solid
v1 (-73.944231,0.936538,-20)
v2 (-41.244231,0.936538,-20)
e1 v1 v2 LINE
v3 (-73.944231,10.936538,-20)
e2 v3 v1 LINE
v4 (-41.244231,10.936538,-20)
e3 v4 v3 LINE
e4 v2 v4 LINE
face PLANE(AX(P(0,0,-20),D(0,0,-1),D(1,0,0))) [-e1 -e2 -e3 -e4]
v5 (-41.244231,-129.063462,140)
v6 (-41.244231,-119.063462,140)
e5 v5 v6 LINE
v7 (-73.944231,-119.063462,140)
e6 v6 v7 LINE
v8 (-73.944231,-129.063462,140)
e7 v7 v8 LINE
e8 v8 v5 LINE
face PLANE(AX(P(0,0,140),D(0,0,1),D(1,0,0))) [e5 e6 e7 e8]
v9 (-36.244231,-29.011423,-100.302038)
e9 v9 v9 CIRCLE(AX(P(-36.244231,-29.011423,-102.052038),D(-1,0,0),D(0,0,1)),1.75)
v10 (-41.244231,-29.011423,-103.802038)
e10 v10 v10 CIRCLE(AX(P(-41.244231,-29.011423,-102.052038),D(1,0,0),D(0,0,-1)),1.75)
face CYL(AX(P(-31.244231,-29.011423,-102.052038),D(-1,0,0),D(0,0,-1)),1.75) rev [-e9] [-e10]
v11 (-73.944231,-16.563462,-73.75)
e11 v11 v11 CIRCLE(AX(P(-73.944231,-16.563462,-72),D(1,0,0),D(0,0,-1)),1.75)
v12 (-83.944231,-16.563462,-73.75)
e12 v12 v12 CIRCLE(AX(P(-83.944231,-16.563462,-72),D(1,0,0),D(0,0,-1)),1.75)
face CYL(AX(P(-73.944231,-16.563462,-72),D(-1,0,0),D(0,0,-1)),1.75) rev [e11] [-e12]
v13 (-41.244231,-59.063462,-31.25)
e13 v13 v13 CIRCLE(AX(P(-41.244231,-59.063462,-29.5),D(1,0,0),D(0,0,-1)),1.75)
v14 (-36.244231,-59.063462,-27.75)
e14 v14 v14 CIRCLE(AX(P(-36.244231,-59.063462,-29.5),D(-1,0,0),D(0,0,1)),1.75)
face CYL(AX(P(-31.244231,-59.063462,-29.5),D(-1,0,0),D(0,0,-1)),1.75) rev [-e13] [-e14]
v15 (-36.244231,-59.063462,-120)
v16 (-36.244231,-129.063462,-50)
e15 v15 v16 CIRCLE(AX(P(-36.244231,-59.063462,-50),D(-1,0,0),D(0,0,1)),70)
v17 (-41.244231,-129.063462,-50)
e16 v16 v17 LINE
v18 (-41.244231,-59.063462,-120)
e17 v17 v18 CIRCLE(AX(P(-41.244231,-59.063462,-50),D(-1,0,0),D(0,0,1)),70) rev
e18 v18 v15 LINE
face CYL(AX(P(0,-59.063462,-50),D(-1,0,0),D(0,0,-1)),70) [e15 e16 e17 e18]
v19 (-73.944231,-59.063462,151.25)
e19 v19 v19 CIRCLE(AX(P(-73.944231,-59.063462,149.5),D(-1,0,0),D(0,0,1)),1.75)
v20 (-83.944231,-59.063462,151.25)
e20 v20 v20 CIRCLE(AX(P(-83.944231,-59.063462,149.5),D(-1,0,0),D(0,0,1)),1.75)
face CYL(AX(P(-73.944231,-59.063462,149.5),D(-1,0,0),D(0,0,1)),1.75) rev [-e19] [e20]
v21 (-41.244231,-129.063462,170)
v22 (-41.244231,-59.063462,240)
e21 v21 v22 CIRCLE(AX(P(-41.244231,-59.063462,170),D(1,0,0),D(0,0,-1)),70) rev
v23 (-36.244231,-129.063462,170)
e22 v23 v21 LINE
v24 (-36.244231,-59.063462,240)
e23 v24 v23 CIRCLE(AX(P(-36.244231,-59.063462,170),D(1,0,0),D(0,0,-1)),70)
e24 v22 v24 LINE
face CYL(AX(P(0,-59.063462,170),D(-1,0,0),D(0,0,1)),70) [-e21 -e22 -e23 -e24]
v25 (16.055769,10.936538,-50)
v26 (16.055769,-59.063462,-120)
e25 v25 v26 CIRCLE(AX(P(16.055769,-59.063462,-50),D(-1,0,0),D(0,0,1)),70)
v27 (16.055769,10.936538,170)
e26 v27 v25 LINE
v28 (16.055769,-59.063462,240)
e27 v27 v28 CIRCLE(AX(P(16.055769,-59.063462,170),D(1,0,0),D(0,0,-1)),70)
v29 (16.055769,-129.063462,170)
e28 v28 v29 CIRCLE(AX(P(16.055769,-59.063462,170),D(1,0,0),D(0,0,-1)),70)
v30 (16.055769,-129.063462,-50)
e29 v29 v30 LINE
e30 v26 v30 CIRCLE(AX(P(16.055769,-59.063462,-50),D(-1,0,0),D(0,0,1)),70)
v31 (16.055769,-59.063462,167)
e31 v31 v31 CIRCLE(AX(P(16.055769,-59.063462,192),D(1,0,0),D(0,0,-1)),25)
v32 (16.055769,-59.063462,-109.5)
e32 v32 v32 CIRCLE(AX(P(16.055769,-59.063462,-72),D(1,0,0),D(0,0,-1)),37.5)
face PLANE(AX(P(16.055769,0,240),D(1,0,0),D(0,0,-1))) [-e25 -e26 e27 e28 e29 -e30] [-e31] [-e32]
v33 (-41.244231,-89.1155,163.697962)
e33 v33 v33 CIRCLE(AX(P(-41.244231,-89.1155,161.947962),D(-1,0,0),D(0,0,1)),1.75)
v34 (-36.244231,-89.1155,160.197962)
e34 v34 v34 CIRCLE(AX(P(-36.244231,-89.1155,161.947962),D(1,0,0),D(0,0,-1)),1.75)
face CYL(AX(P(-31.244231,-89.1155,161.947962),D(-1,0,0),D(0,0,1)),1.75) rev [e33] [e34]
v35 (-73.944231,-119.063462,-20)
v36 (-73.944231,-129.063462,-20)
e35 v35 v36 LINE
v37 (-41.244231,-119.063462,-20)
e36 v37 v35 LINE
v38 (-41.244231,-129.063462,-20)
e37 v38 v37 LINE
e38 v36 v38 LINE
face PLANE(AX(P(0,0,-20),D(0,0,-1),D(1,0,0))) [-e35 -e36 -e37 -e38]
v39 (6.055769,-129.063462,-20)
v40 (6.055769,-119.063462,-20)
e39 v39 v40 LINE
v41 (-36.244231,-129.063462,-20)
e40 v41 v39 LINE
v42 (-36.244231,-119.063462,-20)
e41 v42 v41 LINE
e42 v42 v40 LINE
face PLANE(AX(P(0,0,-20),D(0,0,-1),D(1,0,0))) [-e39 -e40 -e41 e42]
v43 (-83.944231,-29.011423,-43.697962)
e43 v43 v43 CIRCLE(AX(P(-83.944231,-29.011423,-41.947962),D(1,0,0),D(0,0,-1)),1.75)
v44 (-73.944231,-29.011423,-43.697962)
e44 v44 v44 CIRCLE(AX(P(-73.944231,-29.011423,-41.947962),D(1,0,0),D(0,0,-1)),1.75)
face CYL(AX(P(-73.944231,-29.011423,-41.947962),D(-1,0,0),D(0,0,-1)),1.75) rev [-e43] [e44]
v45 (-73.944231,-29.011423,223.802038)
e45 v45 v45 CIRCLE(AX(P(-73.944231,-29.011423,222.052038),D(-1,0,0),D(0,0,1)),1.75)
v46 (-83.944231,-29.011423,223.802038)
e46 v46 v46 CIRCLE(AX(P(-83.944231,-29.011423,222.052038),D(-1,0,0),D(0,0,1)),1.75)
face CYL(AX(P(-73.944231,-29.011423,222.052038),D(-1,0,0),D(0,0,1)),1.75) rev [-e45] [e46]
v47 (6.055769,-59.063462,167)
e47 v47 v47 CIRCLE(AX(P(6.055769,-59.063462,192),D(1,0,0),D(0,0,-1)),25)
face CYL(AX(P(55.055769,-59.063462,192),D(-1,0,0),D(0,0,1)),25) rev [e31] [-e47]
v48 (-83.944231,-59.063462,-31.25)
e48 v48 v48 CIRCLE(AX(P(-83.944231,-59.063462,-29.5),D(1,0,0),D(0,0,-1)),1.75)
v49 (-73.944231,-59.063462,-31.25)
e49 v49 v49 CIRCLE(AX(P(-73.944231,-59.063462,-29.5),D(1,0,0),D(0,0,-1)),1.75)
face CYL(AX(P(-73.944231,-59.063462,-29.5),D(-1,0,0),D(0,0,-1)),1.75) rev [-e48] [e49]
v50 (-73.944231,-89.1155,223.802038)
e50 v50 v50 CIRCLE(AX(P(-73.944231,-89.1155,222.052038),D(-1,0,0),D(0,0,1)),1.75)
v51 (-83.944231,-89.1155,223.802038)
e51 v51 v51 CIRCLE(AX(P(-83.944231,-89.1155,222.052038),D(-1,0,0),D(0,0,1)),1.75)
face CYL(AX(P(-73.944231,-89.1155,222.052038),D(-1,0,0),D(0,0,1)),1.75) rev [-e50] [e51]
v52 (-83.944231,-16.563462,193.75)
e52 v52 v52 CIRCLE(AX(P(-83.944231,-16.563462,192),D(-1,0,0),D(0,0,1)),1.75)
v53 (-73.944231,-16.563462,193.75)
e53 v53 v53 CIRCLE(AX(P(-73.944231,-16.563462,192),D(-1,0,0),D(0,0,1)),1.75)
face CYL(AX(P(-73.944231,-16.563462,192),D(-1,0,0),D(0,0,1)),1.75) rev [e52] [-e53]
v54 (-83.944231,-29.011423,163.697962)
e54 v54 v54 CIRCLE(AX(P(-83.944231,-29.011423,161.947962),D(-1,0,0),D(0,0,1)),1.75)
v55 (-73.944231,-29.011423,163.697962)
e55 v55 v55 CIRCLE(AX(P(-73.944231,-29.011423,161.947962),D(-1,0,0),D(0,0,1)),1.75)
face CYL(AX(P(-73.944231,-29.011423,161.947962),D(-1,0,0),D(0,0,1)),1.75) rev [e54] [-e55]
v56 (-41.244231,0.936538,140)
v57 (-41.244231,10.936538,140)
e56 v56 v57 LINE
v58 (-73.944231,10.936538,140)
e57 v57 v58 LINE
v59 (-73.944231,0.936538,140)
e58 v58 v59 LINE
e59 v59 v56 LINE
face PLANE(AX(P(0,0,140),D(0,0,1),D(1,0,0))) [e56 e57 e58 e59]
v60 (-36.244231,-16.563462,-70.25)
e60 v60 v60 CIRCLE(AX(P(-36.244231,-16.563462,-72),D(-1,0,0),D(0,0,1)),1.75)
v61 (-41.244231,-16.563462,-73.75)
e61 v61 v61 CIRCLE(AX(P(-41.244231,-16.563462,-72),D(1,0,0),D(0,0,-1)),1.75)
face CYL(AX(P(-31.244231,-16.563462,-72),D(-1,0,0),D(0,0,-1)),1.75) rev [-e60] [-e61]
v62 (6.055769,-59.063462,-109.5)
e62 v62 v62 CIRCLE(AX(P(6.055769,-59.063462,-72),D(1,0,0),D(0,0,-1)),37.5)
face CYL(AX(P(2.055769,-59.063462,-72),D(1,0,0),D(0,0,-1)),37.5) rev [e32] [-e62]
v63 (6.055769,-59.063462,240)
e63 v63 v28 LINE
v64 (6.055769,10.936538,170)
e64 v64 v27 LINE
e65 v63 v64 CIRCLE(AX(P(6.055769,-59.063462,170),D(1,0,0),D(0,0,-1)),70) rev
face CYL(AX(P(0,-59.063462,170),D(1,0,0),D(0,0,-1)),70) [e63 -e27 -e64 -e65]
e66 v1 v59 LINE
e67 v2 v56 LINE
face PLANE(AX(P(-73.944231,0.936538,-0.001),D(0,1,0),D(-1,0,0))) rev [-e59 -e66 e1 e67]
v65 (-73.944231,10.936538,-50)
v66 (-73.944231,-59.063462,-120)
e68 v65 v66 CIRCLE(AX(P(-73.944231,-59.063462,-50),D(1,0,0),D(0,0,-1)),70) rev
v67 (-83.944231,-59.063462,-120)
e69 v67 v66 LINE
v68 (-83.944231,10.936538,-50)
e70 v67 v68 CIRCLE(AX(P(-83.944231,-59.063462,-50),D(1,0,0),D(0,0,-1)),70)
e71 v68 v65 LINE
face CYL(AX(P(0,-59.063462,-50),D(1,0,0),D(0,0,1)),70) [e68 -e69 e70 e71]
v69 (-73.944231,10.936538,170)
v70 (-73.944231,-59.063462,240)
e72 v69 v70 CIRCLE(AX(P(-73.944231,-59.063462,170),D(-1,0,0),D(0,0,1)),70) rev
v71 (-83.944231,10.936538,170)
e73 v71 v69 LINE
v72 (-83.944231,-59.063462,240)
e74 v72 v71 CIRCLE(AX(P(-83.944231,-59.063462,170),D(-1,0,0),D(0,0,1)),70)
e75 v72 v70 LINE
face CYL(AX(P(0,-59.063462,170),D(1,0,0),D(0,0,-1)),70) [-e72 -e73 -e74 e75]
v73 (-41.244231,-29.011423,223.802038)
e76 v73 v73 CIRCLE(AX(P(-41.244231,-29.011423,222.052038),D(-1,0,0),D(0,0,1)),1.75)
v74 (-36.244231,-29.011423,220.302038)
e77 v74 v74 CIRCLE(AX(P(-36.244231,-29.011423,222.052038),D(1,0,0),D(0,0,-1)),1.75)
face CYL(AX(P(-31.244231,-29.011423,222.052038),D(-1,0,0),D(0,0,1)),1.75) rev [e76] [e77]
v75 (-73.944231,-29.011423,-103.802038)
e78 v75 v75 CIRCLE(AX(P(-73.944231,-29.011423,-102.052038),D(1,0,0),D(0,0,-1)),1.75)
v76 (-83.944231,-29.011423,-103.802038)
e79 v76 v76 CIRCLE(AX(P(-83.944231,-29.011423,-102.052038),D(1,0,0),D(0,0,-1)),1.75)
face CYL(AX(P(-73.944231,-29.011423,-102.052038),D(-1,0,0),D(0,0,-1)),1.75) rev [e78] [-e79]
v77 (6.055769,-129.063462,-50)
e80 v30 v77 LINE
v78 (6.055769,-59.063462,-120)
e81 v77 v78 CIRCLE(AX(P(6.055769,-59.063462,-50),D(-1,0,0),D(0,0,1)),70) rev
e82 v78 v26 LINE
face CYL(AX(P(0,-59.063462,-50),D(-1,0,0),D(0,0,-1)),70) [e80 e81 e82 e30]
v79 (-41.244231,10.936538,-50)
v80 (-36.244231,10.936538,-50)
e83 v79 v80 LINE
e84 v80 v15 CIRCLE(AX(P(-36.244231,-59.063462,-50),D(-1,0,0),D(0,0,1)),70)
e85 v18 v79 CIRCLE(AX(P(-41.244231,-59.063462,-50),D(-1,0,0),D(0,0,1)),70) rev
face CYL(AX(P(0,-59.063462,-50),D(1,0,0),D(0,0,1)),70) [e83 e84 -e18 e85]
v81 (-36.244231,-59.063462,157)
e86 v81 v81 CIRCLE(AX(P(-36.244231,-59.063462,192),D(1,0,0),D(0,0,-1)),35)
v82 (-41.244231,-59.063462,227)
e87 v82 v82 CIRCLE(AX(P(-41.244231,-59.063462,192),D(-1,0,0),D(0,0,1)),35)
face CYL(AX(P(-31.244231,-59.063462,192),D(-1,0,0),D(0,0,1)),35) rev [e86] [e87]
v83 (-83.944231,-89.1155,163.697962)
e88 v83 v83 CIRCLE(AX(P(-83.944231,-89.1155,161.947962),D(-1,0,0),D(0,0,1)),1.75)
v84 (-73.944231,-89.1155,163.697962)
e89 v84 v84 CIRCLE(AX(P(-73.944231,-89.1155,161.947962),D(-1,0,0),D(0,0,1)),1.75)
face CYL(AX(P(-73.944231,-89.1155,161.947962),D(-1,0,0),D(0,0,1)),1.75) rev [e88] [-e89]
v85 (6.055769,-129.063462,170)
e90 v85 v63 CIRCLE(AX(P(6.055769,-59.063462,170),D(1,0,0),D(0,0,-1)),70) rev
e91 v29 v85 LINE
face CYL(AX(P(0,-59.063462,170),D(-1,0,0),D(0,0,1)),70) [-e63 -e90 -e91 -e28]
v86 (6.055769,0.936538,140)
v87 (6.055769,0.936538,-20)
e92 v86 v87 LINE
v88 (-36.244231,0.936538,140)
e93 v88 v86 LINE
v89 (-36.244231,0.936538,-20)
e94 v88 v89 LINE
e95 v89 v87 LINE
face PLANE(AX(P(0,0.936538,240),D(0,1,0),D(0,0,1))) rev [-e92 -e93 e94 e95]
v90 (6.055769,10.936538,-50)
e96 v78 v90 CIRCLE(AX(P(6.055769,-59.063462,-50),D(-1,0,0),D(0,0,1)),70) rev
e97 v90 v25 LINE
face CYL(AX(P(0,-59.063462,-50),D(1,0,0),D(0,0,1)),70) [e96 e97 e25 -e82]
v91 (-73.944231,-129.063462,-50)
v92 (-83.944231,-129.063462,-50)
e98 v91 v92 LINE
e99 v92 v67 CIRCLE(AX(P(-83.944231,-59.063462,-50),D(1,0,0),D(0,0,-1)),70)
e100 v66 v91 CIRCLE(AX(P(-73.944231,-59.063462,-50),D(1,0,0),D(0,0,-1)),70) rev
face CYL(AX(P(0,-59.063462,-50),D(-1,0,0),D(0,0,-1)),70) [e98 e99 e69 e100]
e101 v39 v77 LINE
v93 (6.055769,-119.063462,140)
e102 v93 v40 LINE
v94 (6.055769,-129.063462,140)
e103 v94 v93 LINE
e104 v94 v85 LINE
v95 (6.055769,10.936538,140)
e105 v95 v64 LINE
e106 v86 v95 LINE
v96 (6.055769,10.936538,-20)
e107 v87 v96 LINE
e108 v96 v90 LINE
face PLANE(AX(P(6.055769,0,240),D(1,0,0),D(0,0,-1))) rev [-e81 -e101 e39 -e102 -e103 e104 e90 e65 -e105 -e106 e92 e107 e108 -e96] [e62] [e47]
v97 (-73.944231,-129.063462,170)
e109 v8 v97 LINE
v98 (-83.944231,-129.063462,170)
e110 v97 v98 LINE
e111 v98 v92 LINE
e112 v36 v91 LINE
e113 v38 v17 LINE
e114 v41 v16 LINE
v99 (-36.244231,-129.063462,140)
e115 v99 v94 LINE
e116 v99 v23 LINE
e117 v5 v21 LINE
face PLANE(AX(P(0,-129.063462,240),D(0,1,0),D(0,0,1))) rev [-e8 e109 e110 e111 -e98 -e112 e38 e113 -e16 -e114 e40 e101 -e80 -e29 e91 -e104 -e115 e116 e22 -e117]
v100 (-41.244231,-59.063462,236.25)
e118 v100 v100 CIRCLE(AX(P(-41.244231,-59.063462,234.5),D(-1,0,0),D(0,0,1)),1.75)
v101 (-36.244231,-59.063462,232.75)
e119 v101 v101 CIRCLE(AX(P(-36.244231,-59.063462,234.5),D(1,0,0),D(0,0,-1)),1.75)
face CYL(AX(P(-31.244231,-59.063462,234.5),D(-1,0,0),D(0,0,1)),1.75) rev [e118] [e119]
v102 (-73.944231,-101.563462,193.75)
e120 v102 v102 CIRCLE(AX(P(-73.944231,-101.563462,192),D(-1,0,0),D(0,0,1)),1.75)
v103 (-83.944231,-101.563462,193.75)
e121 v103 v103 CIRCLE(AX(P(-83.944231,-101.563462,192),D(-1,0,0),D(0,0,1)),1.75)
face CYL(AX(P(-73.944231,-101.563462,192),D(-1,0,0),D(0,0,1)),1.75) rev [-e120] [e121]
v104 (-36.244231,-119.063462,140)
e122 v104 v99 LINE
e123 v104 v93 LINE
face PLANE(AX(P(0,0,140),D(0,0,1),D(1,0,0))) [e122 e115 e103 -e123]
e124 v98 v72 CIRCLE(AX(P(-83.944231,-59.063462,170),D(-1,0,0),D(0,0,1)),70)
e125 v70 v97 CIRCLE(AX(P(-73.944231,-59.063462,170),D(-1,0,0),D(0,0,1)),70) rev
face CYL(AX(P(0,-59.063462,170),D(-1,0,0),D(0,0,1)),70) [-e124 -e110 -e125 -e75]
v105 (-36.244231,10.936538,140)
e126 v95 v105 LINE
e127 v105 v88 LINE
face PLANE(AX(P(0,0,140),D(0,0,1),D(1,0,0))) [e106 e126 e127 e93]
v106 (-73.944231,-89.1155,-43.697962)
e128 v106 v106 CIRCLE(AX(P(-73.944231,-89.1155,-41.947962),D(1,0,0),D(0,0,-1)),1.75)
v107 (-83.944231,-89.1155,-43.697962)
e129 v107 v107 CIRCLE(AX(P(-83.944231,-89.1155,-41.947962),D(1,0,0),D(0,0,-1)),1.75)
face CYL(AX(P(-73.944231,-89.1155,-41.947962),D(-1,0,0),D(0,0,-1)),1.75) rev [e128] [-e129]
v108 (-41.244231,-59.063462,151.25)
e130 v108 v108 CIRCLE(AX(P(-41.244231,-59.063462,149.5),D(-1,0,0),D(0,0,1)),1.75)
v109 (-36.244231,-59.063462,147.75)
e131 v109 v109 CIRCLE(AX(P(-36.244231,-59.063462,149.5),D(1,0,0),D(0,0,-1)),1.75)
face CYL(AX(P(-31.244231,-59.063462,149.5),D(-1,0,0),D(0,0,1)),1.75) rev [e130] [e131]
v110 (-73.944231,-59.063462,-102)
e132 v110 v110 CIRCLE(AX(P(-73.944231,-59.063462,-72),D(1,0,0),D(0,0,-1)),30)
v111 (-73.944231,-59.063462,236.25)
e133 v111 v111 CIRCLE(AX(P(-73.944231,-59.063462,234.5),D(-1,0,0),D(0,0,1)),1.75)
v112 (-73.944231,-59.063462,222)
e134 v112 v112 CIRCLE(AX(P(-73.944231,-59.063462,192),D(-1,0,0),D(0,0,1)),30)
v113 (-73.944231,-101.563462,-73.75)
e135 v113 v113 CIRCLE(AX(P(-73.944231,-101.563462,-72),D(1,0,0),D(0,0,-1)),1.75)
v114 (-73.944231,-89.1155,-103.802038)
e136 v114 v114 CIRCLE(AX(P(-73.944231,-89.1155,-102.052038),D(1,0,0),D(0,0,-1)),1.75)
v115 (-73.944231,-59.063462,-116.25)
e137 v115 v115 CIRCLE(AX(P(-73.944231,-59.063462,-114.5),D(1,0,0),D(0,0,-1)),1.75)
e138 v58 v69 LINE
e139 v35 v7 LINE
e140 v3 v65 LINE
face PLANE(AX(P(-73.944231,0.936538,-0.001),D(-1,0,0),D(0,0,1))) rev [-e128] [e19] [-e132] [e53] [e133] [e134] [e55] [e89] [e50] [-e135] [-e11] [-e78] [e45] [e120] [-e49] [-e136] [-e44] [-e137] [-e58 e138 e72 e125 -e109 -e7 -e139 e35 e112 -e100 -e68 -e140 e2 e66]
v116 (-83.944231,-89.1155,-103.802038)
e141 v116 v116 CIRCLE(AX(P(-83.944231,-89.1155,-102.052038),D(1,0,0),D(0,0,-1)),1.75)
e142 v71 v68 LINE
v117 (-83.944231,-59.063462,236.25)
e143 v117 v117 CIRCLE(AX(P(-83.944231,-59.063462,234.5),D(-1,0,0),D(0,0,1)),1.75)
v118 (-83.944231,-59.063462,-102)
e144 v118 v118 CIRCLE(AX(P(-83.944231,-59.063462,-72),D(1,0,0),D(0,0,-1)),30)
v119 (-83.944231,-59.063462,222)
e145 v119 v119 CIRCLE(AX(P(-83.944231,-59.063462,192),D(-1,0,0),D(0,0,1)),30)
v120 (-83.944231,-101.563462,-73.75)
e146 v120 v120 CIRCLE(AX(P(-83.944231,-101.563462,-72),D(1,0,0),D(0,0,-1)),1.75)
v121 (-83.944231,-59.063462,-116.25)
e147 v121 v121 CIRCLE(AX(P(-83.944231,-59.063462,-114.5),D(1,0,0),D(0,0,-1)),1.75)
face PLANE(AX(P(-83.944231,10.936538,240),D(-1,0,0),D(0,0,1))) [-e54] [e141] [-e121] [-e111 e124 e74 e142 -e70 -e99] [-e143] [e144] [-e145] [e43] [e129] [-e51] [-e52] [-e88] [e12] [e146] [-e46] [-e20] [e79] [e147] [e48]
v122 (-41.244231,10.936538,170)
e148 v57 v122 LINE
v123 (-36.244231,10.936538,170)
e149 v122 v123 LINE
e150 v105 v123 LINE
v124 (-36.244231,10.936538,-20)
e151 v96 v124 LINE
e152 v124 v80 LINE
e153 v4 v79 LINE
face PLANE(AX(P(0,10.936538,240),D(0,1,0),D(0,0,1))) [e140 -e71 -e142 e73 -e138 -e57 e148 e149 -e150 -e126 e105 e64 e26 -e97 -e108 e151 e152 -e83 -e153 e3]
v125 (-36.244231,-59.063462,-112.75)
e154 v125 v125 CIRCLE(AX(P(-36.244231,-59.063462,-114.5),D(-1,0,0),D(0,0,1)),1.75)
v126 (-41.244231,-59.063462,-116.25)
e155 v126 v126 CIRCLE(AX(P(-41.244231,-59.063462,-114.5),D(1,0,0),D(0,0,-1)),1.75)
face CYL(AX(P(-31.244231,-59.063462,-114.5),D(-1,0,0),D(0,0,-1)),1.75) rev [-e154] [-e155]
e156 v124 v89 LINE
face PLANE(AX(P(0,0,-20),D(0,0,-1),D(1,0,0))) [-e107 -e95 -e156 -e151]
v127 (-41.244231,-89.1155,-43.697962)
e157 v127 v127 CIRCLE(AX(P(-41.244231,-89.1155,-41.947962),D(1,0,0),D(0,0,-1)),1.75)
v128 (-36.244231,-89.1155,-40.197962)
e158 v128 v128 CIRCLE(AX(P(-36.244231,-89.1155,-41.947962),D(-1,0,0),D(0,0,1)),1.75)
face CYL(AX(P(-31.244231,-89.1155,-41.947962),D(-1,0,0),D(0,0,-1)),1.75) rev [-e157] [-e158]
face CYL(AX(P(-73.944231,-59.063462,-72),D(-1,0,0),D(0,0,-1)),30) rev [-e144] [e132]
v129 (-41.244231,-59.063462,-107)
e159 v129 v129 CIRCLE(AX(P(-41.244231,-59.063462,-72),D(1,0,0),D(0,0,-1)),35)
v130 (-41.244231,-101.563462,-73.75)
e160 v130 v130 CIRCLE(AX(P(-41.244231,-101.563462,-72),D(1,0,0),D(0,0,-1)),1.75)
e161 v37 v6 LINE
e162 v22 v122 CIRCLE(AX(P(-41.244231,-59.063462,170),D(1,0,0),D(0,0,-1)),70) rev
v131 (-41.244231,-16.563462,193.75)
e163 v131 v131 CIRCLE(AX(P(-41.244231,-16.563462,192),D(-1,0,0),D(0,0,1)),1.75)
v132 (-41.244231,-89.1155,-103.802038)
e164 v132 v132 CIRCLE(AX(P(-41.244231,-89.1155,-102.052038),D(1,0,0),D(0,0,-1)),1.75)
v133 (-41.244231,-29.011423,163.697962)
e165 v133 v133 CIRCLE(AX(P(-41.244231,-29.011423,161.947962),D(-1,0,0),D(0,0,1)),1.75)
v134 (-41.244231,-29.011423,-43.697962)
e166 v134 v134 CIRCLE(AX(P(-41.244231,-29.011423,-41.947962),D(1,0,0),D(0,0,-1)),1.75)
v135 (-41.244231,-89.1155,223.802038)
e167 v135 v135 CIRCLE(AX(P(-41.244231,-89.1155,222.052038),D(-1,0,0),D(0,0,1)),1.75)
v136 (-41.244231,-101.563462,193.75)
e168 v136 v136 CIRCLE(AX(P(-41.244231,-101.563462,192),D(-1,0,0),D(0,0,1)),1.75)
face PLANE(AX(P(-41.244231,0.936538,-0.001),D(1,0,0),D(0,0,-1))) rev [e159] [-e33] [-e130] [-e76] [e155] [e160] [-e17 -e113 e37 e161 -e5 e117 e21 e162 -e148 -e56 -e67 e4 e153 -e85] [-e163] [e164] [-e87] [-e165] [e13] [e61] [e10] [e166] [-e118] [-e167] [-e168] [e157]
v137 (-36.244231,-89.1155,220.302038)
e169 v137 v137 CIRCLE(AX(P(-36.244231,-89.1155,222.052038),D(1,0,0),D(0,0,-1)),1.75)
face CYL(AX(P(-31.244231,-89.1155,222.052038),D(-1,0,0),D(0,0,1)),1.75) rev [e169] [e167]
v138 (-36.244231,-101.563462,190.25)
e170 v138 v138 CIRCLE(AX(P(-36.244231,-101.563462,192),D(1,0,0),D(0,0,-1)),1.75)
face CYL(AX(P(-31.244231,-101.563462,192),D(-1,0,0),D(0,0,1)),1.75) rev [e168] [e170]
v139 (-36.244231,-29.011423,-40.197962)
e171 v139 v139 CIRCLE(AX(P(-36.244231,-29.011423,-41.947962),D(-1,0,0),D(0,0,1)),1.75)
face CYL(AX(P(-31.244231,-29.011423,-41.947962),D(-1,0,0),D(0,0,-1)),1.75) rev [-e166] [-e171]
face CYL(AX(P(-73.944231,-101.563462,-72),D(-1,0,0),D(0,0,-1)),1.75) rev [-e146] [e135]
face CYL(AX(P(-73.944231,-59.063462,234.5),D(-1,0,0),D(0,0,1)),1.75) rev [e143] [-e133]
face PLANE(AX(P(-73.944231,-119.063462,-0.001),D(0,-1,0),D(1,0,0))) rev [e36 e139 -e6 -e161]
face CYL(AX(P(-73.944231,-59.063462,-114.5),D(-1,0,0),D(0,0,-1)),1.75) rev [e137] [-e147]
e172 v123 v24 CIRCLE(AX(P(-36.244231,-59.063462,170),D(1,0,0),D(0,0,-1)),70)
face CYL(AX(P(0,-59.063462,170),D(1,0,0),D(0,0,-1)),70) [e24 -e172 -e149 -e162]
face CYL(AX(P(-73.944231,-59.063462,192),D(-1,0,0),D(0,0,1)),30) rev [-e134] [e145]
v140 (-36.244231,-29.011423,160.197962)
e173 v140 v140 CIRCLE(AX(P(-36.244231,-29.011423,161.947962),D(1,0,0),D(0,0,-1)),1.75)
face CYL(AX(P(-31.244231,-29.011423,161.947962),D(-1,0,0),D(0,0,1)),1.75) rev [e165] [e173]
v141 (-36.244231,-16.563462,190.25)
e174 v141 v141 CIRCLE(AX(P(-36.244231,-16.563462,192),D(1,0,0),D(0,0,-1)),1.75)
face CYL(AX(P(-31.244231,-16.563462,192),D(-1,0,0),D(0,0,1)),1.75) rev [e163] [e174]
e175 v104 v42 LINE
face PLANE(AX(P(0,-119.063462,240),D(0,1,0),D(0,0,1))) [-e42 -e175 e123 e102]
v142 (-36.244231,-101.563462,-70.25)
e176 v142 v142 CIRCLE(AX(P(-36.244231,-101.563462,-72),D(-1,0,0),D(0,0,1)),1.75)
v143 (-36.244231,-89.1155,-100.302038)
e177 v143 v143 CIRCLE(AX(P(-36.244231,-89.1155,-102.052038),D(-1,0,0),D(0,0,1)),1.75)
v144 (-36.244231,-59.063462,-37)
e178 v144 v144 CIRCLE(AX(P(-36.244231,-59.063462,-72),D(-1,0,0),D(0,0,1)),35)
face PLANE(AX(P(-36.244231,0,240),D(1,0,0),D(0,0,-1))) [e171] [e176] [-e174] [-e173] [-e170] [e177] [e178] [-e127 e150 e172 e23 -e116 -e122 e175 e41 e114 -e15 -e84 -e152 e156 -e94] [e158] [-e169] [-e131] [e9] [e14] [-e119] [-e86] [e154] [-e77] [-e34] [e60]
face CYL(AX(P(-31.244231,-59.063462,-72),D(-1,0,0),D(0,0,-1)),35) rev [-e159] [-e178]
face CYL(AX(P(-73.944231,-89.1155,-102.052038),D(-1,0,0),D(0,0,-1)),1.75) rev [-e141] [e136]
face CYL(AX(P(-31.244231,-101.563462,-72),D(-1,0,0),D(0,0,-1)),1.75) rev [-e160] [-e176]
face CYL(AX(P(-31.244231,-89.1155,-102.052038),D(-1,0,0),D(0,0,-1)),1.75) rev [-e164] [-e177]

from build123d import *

# Parameters (mm, degrees)
SKETCH_1_W           = 42.3
SKETCH_1_H           = 10
EXTRUDE_3_DEPTH      = 240
SKETCH_2_W           = 42.3
SKETCH_2_H           = 140
CUT_EXTRUDE_1_DEPTH  = 100
SKETCH_3_W           = 42.7
SKETCH_3_H           = 240
EXTRUDE_4_DEPTH      = 140
CUT_EXTRUDE_2_REACH  = 287.139
SKETCH_4_W           = 32.7
SKETCH_4_H           = 120
SKETCH_7_W           = 32.7
SKETCH_7_H           = 140
CUT_EXTRUDE_6_DEPTH  = 100
FILLET_2_R           = 70
SKETCH_6_R           = 35
SKETCH_6_R_2         = 1.75
CUT_EXTRUDE_7_DEPTH  = 10
SKETCH_5_R           = 30
SKETCH_5_R_2         = 1.75
CUT_EXTRUDE_8_DEPTH  = 10
SKETCH_8_W           = 10
SKETCH_8_H           = 140
EXTRUDE_5_DEPTH      = 110
FILLET_4_R           = 60
SKETCH_17_R          = 25
CUT_EXTRUDE_13_DEPTH = 139
CUT_EXTRUDE_14_DEPTH = 110
SKETCH_19_R          = 37.5
CUT_EXTRUDE_15_DEPTH = 14


with BuildPart() as part:
    # 草图1 → 凸台-拉伸3 (new body)
    with BuildSketch(Plane.XY):
        with Locations((-15.094230769, 5.936538462)):
            Rectangle(SKETCH_1_W, SKETCH_1_H)
        Polygon((-36.244230769, 0.936538462), (-36.244230769, 10.936538462), (-41.244230769, 10.936538462), (-41.244230769, -129.063461538), (-36.244230769, -129.063461538), (-36.244230769, -119.063461538), align=None)
        Polygon((16.055769231, 10.936538462), (6.055769231, 10.936538462), (6.055769231, 0.936538462), (6.055769231, -119.063461538), (6.055769231, -129.063461538), (16.055769231, -129.063461538), align=None)
        with Locations((-15.094230769, -124.063461538)):
            Rectangle(SKETCH_1_W, SKETCH_1_H)
    extrude(amount=EXTRUDE_3_DEPTH)

    # 草图2 → 切除-拉伸1 (cut)
    with BuildSketch(Plane.XY.offset(240)):
        with Locations((-15.094230769, -59.063461538)):
            Rectangle(SKETCH_2_W, SKETCH_2_H)
    extrude(amount=-CUT_EXTRUDE_1_DEPTH, mode=Mode.SUBTRACT)

    # 草图3 → 凸台-拉伸4 (add)
    with BuildSketch(Plane.XZ.offset(129.063461538)):
        with Locations((-62.594230769, 120)):
            Rectangle(SKETCH_3_W, SKETCH_3_H)
    extrude(amount=-EXTRUDE_4_DEPTH)

    # 草图4 → 切除-拉伸2 (cut, up to next)
    with BuildSketch(Plane.XY.offset(240), mode=Mode.PRIVATE) as cut_extrude_2_sk1:
        with Locations((-57.594230769, -59.063461538)):
            Rectangle(SKETCH_4_W, SKETCH_4_H)
    cut_extrude_2_tool1 = extrude(cut_extrude_2_sk1.sketch, amount=-CUT_EXTRUDE_2_REACH, mode=Mode.PRIVATE) & part.part
    add(cut_extrude_2_tool1.solids().sort_by_distance((-57.594231, -59.063462, 240))[0], mode=Mode.SUBTRACT)

    # 草图7 → 切除-拉伸6 (cut)
    with BuildSketch(Plane.XY.offset(240)):
        with Locations((-57.594230769, -59.063461538)):
            Rectangle(SKETCH_7_W, SKETCH_7_H)
    extrude(amount=-CUT_EXTRUDE_6_DEPTH, mode=Mode.SUBTRACT)

    # 圆角2
    fillet_2_edges = [part.edges().sort_by_distance(p)[0] for p in [
        (11.055769231, 10.936538462, 240),
        (-38.744230769, 10.936538462, 240),
        (-78.944230769, 10.936538462, 240),
        (11.055769231, -129.063461538, 240),
        (-38.744230769, -129.063461538, 240),
        (-78.944230769, -129.063461538, 240),
    ]]
    fillet(fillet_2_edges, radius=FILLET_2_R - 0.0001)  # a hair under: the kernel refuses the full size

    # 草图6 → 切除-拉伸7 (cut)
    with BuildSketch(Plane.ZY.offset(41.244230769)):
        with Locations((192, -59.063461538)):
            Circle(SKETCH_6_R)
        with Locations((149.5, -59.063461538)):
            Circle(SKETCH_6_R_2)
        with Locations((161.9479618, -29.011423338)):
            Circle(SKETCH_6_R_2)
        with Locations((192, -16.563461538)):
            Circle(SKETCH_6_R_2)
        with Locations((222.0520382, -29.011423338)):
            Circle(SKETCH_6_R_2)
        with Locations((234.5, -59.063461538)):
            Circle(SKETCH_6_R_2)
        with Locations((222.0520382, -89.115499739)):
            Circle(SKETCH_6_R_2)
        with Locations((192, -101.563461538)):
            Circle(SKETCH_6_R_2)
        with Locations((161.9479618, -89.115499739)):
            Circle(SKETCH_6_R_2)
    extrude(amount=-CUT_EXTRUDE_7_DEPTH, mode=Mode.SUBTRACT)

    # 草图5 → 切除-拉伸8 (cut)
    with BuildSketch(Plane.ZY.offset(83.944230769)):
        with Locations((192, -59.063461538)):
            Circle(SKETCH_5_R)
        with Locations((161.9479618, -29.011423338)):
            Circle(SKETCH_5_R_2)
        with Locations((149.5, -59.063461538)):
            Circle(SKETCH_5_R_2)
        with Locations((161.9479618, -89.115499739)):
            Circle(SKETCH_5_R_2)
        with Locations((192, -101.563461538)):
            Circle(SKETCH_5_R_2)
        with Locations((222.0520382, -89.115499739)):
            Circle(SKETCH_5_R_2)
        with Locations((234.5, -59.063461538)):
            Circle(SKETCH_5_R_2)
        with Locations((222.0520382, -29.011423338)):
            Circle(SKETCH_5_R_2)
        with Locations((192, -16.563461538)):
            Circle(SKETCH_5_R_2)
    extrude(amount=-CUT_EXTRUDE_8_DEPTH, mode=Mode.SUBTRACT)

    # 草图8 → 凸台-拉伸5 (add)
    with BuildSketch(Plane(origin=(0, 0, 0), x_dir=(-1, 0, 0), z_dir=(0, 0, -1))):
        with Locations((-11.055769231, -59.063461538)):
            Rectangle(SKETCH_8_W, SKETCH_8_H)
        with Locations((78.944230769, -59.063461538)):
            Rectangle(SKETCH_8_W, SKETCH_8_H)
    extrude(amount=EXTRUDE_5_DEPTH)

    # 圆角4
    fillet_4_edges = [part.edges().sort_by_distance(p)[0] for p in [
        (11.055769231, 10.936538462, -110),
        (11.055769231, -129.063461538, -110),
        (-78.944230769, -129.063461538, -110),
        (-78.944230769, 10.936538462, -110),
    ]]
    fillet(fillet_4_edges, radius=FILLET_4_R)

    # 草图17 → 切除-拉伸13 (cut)
    with BuildSketch(Plane.ZY.offset(83.944230769)):
        with Locations(Location((192, -59.063461538, 0), (0, 0, 180))):
            Circle(SKETCH_17_R)
    extrude(amount=-CUT_EXTRUDE_13_DEPTH, mode=Mode.SUBTRACT)

    # 草图18 → 切除-拉伸14 (cut)
    with BuildSketch(Plane(origin=(16.055769231, 0, 0), x_dir=(0, 0, -1), z_dir=(1, 0, 0))):
        with BuildLine():
            Line((-60, 86.355512133), (-60, 10.936538462))
            Line((-60, 10.936538462), (50, 10.936538462))
            ThreePointArc((50, 10.936538462), (92.426406871, -6.637054667), (110, -49.063461538))
            Line((110, -49.063461538), (110, -69.063461538))
            ThreePointArc((110, -69.063461538), (92.426406871, -111.48986841), (50, -129.063461538))
            Line((50, -129.063461538), (-60, -129.063461538))
            Line((-60, -129.063461538), (-60, -152.364477091))
            Line((-60, -152.364477091), (264.503295558, -152.364477091))
            Line((264.503295558, -152.364477091), (264.503295558, 86.355512133))
            Line((264.503295558, 86.355512133), (-60, 86.355512133))
        make_face()
        with BuildLine():
            Line((50, 10.936538462), (-60, 10.936538462))
            Line((-60, 10.936538462), (-60, -129.063461538))
            Line((-60, -129.063461538), (50, -129.063461538))
            ThreePointArc((50, -129.063461538), (92.426406871, -111.48986841), (110, -69.063461538))
            Line((110, -69.063461538), (110, -49.063461538))
            ThreePointArc((110, -49.063461538), (92.426406871, -6.637054667), (50, 10.936538462))
        make_face()
    extrude(amount=-CUT_EXTRUDE_14_DEPTH, mode=Mode.SUBTRACT)

    # 镜向2: part across plane


with BuildPart() as part_1:
    add(part.part)
    add(part.part.mirror(Plane(origin=(-93.944230769, 0, 60), x_dir=(1, 0, 0), z_dir=(0, 0, 1))))

    # 草图19 → 切除-拉伸15 (cut)
    with BuildSketch(Plane(origin=(16.055769231, 0, 0), x_dir=(0, 0, -1), z_dir=(1, 0, 0))):
        with Locations((72, -59.063461538)):
            Circle(SKETCH_19_R)
    extrude(amount=-CUT_EXTRUDE_15_DEPTH, mode=Mode.SUBTRACT)


solid = part_1.part
